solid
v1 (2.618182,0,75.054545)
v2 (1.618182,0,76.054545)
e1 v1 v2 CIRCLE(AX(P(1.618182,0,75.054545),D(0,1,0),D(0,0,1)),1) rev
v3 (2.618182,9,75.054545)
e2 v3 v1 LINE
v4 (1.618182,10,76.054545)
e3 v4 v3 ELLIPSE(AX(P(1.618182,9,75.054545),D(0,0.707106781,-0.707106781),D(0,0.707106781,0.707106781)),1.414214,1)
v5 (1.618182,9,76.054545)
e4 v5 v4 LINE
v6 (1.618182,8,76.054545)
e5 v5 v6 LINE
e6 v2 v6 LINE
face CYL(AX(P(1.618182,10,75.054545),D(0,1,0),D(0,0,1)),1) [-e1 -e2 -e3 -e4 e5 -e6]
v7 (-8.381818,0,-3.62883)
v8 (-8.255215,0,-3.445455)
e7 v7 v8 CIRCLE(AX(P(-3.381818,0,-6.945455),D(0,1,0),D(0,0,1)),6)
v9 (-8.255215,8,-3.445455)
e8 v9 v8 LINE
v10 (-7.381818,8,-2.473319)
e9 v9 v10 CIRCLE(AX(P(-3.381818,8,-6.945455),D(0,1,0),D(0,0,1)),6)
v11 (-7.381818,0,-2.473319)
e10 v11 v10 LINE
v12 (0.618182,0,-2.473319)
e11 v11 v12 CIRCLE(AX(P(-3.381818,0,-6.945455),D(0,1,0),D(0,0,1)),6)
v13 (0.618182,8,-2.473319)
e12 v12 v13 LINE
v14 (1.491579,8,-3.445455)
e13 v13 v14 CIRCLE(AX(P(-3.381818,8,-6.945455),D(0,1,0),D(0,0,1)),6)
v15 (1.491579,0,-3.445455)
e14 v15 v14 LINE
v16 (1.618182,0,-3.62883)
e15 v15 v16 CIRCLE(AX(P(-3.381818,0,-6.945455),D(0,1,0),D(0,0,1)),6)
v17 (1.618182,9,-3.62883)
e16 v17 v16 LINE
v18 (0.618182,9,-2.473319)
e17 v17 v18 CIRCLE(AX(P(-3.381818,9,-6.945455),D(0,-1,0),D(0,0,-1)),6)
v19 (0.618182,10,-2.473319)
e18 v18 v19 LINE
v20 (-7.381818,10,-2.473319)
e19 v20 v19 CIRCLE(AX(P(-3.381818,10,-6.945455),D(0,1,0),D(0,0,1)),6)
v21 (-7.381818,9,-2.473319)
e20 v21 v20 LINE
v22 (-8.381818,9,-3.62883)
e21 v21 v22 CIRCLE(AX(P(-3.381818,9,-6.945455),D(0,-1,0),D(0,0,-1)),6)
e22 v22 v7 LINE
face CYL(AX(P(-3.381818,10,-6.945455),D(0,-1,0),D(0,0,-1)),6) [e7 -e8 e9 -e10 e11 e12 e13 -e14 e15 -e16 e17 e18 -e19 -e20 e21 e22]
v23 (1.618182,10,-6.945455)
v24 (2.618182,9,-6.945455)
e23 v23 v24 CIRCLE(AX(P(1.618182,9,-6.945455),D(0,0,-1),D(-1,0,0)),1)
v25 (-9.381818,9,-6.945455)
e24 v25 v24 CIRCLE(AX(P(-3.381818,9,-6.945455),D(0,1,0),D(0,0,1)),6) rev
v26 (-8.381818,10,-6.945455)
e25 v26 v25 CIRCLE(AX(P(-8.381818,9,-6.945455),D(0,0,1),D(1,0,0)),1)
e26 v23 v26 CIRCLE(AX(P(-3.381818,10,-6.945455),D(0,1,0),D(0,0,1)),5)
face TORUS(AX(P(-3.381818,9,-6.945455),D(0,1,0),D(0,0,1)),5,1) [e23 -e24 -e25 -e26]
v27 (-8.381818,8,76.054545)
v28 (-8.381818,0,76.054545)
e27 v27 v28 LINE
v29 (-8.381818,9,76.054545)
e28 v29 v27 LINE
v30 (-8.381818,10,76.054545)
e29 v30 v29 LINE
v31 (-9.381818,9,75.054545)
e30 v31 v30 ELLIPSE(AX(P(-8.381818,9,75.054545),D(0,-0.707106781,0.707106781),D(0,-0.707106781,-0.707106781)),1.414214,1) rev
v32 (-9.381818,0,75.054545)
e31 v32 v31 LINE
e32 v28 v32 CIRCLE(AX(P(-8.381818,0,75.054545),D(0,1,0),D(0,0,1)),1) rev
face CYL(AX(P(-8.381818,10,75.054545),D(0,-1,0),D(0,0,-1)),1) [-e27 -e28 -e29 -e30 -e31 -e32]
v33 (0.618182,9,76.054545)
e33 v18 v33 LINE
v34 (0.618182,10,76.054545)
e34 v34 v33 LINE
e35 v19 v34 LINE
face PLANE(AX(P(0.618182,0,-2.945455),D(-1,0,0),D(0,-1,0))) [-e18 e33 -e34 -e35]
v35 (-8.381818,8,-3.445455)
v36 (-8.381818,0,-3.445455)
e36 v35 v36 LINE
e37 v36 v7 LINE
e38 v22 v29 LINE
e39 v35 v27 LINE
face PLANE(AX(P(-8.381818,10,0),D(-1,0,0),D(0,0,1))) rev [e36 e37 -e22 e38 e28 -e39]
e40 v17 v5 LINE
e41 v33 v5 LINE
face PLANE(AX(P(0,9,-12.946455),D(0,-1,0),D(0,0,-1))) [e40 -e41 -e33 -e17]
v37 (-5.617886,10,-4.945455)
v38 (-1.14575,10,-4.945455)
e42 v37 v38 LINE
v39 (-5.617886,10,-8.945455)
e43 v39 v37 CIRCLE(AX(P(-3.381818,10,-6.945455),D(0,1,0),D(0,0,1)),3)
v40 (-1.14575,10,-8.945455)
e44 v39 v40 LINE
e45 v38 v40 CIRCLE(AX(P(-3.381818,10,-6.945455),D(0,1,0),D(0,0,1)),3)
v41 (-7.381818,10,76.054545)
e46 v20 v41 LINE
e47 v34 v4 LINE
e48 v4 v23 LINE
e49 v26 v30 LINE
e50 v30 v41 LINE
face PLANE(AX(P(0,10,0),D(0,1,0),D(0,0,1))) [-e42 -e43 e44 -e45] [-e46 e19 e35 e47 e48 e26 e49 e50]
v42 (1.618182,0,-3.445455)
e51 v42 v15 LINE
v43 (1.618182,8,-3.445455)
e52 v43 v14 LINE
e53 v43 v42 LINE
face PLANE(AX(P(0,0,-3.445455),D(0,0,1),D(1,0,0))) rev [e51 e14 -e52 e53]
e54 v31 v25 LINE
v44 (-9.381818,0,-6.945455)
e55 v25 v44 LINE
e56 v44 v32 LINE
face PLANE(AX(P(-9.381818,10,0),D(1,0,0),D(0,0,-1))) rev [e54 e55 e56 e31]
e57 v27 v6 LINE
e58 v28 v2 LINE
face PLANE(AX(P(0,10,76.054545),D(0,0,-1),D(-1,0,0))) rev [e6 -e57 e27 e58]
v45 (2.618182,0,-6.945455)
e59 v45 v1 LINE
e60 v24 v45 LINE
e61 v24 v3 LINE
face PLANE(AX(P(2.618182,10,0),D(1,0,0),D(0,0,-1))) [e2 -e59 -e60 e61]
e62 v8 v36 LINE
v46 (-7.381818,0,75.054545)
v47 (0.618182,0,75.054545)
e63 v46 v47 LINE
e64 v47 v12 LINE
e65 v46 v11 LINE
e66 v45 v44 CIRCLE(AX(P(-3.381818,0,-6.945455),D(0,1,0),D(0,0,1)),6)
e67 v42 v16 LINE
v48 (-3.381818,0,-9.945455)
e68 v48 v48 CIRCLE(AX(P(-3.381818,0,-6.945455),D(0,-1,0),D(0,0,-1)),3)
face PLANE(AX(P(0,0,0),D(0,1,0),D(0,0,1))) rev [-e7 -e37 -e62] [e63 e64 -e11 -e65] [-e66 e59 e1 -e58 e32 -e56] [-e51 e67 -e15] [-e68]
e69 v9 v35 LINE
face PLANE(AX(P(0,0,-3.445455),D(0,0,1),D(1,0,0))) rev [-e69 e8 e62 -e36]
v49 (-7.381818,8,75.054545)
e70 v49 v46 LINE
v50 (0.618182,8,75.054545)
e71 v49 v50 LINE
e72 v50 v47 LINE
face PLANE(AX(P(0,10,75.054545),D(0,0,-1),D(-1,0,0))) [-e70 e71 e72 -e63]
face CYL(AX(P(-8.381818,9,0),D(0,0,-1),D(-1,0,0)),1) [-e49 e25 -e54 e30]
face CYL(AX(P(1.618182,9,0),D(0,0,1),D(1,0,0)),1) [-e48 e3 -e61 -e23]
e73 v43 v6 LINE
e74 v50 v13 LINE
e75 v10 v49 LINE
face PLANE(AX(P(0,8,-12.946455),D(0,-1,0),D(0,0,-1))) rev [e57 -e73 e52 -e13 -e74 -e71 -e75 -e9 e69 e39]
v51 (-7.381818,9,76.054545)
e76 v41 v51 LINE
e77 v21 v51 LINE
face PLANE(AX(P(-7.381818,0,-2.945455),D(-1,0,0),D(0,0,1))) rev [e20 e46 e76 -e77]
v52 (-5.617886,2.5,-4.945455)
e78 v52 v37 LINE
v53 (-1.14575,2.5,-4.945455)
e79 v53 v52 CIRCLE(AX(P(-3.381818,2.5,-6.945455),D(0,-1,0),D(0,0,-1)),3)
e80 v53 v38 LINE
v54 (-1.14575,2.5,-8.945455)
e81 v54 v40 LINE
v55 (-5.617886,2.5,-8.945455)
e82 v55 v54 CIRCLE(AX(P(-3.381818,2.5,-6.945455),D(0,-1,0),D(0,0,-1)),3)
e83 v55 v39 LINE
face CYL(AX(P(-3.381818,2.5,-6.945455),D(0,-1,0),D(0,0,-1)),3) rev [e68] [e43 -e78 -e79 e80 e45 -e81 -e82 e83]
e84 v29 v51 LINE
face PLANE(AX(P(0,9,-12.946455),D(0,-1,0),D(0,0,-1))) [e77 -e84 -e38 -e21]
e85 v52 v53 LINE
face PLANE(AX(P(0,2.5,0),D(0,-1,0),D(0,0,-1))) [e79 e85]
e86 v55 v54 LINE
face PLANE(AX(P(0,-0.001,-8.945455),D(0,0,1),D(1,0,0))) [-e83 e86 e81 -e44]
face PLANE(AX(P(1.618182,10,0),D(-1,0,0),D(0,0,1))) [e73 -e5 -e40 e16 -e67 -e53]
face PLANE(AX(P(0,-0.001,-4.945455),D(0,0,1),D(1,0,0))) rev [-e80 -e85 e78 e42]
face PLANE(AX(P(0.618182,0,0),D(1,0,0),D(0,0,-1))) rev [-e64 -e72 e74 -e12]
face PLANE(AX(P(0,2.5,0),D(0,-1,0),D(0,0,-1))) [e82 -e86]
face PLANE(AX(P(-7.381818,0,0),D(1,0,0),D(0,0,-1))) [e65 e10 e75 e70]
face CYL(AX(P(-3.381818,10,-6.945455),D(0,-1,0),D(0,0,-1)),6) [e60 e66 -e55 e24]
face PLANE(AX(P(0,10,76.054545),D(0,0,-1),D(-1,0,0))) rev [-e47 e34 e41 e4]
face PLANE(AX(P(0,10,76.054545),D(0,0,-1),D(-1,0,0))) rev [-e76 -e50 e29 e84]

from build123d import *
from build123d.topology import SkipClean

# Parameters (mm, degrees)
SKETCH1_W           = 1
SKETCH1_H           = 1
SKETCH1_W_2         = 5
BOSS_EXTRUDE2_DEPTH = 10
CUT_EXTRUDE1_DEPTH  = 7.5
CUT_EXTRUDE2_START  = -2.5
CUT_EXTRUDE2_DEPTH  = 2.5
CUT_EXTRUDE3_REACH  = 92.05
SKETCH5_W           = 5
SKETCH5_H           = 1
SKETCH6_W           = 2
SKETCH6_H           = 1
BOSS_EXTRUDE3_DEPTH = 79.5
FILLET1_R           = 1
SKETCH7_W           = 1
SKETCH7_H           = 1
CUT_EXTRUDE7_DEPTH  = 79
BOSS_EXTRUDE4_DEPTH = 3
SKETCH9_W           = 1
SKETCH9_H           = 1
CUT_EXTRUDE8_DEPTH  = 6
SKETCH11_W          = 1
SKETCH11_H          = 1
BOSS_EXTRUDE5_DEPTH = 80
SKETCH12_W          = 1
SKETCH12_H          = 1
BOSS_EXTRUDE6_DEPTH = 80
BOSS_EXTRUDE7_DEPTH = 8
CUT_EXTRUDE9_DEPTH  = 1
SKETCH15_R          = 3
CUT_EXTRUDE10_DEPTH = 2.5
CUT_EXTRUDE13_REACH = 79.281


with BuildPart() as part:
    # Sketch1 → Boss-Extrude2 (new body)
    with BuildSketch(Plane(origin=(0, 0, 0), x_dir=(1, 0, 0), z_dir=(0, 1, 0))):
        with BuildLine():
            Line((-5.881818182, 6.945454545), (-3.381818182, 6.945454545))
            Line((-3.381818182, 6.945454545), (-0.881818182, 6.945454545))
            ThreePointArc((-0.881818182, 6.945454545), (-3.381818182, 9.445454545), (-5.881818182, 6.945454545))
        make_face()
        with BuildLine():
            Line((-0.881818182, 6.945454545), (-3.381818182, 6.945454545))
            Line((-3.381818182, 6.945454545), (-3.381818182, 4.445454545))
            ThreePointArc((-3.381818182, 4.445454545), (-1.614051229, 5.177687592), (-0.881818182, 6.945454545))
        make_face()
        with BuildLine():
            Line((-3.381818182, 4.445454545), (-3.381818182, 6.945454545))
            Line((-3.381818182, 6.945454545), (-5.881818182, 6.945454545))
            ThreePointArc((-5.881818182, 6.945454545), (-5.149585135, 5.177687592), (-3.381818182, 4.445454545))
        make_face()
        with BuildLine():
            ThreePointArc((-0.881818182, 6.945454545), (-1.614051229, 5.177687592), (-3.381818182, 4.445454545))
            Line((-3.381818182, 4.445454545), (-3.381818182, 0.945454545))
            ThreePointArc((-3.381818182, 0.945454545), (-0.544543851, 1.658690472), (1.618181818, 3.628829755))
            ThreePointArc((1.618181818, 3.628829755), (2.362744465, 5.213403738), (2.618181818, 6.945454545))
            Line((2.618181818, 6.945454545), (-0.881818182, 6.945454545))
        make_face()
        with BuildLine():
            Line((-3.381818182, 0.945454545), (-3.381818182, 4.445454545))
            ThreePointArc((-3.381818182, 4.445454545), (-5.149585135, 5.177687592), (-5.881818182, 6.945454545))
            Line((-5.881818182, 6.945454545), (-9.381818182, 6.945454545))
            ThreePointArc((-9.381818182, 6.945454545), (-9.126380828, 5.213403738), (-8.381818182, 3.628829755))
            ThreePointArc((-8.381818182, 3.628829755), (-6.219092513, 1.658690472), (-3.381818182, 0.945454545))
        make_face()
        with BuildLine():
            ThreePointArc((-5.881818182, 6.945454545), (-3.381818182, 9.445454545), (-0.881818182, 6.945454545))
            Line((-0.881818182, 6.945454545), (2.618181818, 6.945454545))
            ThreePointArc((2.618181818, 6.945454545), (-3.381818182, 12.945454545), (-9.381818182, 6.945454545))
            Line((-9.381818182, 6.945454545), (-5.881818182, 6.945454545))
        make_face()
        with BuildLine():
            Line((2.618181818, -75.054545455), (2.618181818, 6.945454545))
            ThreePointArc((2.618181818, 6.945454545), (2.362744465, 5.213403738), (1.618181818, 3.628829755))
            Line((1.618181818, 3.628829755), (1.618181818, -75.054545455))
            Line((1.618181818, -75.054545455), (2.618181818, -75.054545455))
        make_face()
        with BuildLine():
            ThreePointArc((-8.381818182, 3.628829755), (-9.126380828, 5.213403738), (-9.381818182, 6.945454545))
            Line((-9.381818182, 6.945454545), (-9.381818182, -75.054545455))
            Line((-9.381818182, -75.054545455), (-8.381818182, -75.054545455))
            Line((-8.381818182, -75.054545455), (-8.381818182, 3.628829755))
        make_face()
        with Locations((-8.881818182, -75.554545455)):
            Rectangle(SKETCH1_W, SKETCH1_H)
        with Locations((-5.881818182, -75.554545455)):
            Rectangle(SKETCH1_W_2, SKETCH1_H)
        with Locations((-0.881818182, -75.554545455)):
            Rectangle(SKETCH1_W_2, SKETCH1_H)
        with Locations((2.118181818, -75.554545455)):
            Rectangle(SKETCH1_W, SKETCH1_H)
    extrude(amount=BOSS_EXTRUDE2_DEPTH)

    # Sketch3 → Cut-Extrude1 (cut)
    with BuildSketch(Plane(origin=(0, 10, 0), x_dir=(1, 0, 0), z_dir=(0, 1, 0))):
        with BuildLine():
            Line((-1.381818182, 8.445454545), (-5.381818182, 8.445454545))
            ThreePointArc((-5.381818182, 8.445454545), (-5.753526425, 7.736023967), (-5.881818182, 6.945454559))
            ThreePointArc((-5.881818182, 6.945454559), (-5.753526429, 6.154885137), (-5.381818182, 5.445454545))
            Line((-5.381818182, 5.445454545), (-1.381818182, 5.445454545))
            ThreePointArc((-1.381818182, 5.445454545), (-1.010109937, 6.15488513), (-0.881818182, 6.945454545))
            ThreePointArc((-0.881818182, 6.945454545), (-1.010109937, 7.73602396), (-1.381818182, 8.445454545))
        make_face()
    extrude(amount=-CUT_EXTRUDE1_DEPTH, mode=Mode.SUBTRACT)

    # Sketch4 → Cut-Extrude2 (cut)
    with SkipClean():  # the faces are left unmerged after this step: merging them gives an invalid solid
        with BuildSketch(Plane.XZ.offset(CUT_EXTRUDE2_START)):
            with BuildLine():
                ThreePointArc((-0.881818182, -6.945454545), (-1.614051229, -5.177687592), (-3.381818182, -4.445454545))
                Line((-3.381818182, -4.445454545), (-3.381818182, -9.445454545))
                ThreePointArc((-3.381818182, -9.445454545), (-1.614051229, -8.713221498), (-0.881818182, -6.945454545))
            make_face()
            with BuildLine():
                Line((-3.381818182, -9.445454545), (-3.381818182, -4.445454545))
                ThreePointArc((-3.381818182, -4.445454545), (-5.881818182, -6.945454545), (-3.381818182, -9.445454545))
            make_face()
        extrude(amount=CUT_EXTRUDE2_DEPTH, mode=Mode.SUBTRACT)

    # Sketch5 → Cut-Extrude3 (cut, up to next)
    with BuildSketch(Plane.XY.offset(76.054545455), mode=Mode.PRIVATE) as cut_extrude3_sk1:
        with Locations((-5.881818182, 8.5)):
            Rectangle(SKETCH5_W, SKETCH5_H)
    cut_extrude3_tool1 = extrude(cut_extrude3_sk1.sketch, amount=-CUT_EXTRUDE3_REACH, mode=Mode.PRIVATE) & part.part
    # Sketch5 → Cut-Extrude3 (cut, up to next)
    with BuildSketch(Plane.XY.offset(76.054545455), mode=Mode.PRIVATE) as cut_extrude3_sk2:
        with Locations((-0.881818182, 8.5)):
            Rectangle(SKETCH5_W, SKETCH5_H)
    cut_extrude3_tool2 = extrude(cut_extrude3_sk2.sketch, amount=-CUT_EXTRUDE3_REACH, mode=Mode.PRIVATE) & part.part
    add(cut_extrude3_tool1.solids().sort_by_distance((-5.881818, 8.5, 76.054545))[0], mode=Mode.SUBTRACT)
    add(cut_extrude3_tool2.solids().sort_by_distance((-0.881818, 8.5, 76.054545))[0], mode=Mode.SUBTRACT)

    # Sketch6 → Boss-Extrude3 (add)
    with SkipClean():  # the faces are left unmerged after this step: merging them gives an invalid solid
        with BuildSketch(Plane.XY.offset(76.054545455)):
            with Locations((-7.381818182, 9.5)):
                Rectangle(SKETCH6_W, SKETCH6_H)
            with Locations((-7.381818182, 7.5)):
                Rectangle(SKETCH6_W, SKETCH6_H)
            with Locations((0.618181818, 7.5)):
                Rectangle(SKETCH6_W, SKETCH6_H)
            with Locations((0.618181818, 9.5)):
                Rectangle(SKETCH6_W, SKETCH6_H)
        extrude(amount=-BOSS_EXTRUDE3_DEPTH)

    # Fillet1
    fillet1_edges = [part.edges().sort_by_distance(p)[0] for p in [
        (2.618181818, 10, 34.554545455),
        (-9.381818182, 5, 76.054545455),
        (2.618181818, 5, 76.054545455),
        (-3.381818182, 10, -12.945454545),
        (-9.381818182, 10, 34.554545455),
    ]]
    fillet(fillet1_edges, radius=FILLET1_R - 0.0001)  # a hair under: the kernel refuses the full size

    # Sketch7 → Cut-Extrude7 (cut)
    with BuildSketch(Plane.XY.offset(76.054545455)):
        with Locations((-6.881818182, 9.5)):
            Rectangle(SKETCH7_W, SKETCH7_H)
        with Locations((0.118181818, 9.5)):
            Rectangle(SKETCH7_W, SKETCH7_H)
    extrude(amount=-CUT_EXTRUDE7_DEPTH, mode=Mode.SUBTRACT)


with BuildPart() as cut_extrude7_piece_1:
    # of the separate pieces the step leaves, piece 1, a body of its own (cut_extrude7_pieces)
    add(part.part.solids().sort_by_distance((1.618281818, 0, 76.054545455))[0])

    # Sketch8 → Boss-Extrude4 (add)
    # profile 1 of 5: a face of its own
    with BuildSketch(Plane(origin=(0, 10, 0), x_dir=(1, 0, 0), z_dir=(0, 1, 0))):
        with BuildLine():
            Line((-8.381818182, 6.945454545), (-8.381818182, 3.628829755))
            ThreePointArc((-8.381818182, 3.628829755), (-8.319368136, 3.536554363), (-8.255215354, 3.445454545))
            ThreePointArc((-8.255215354, 3.445454545), (-7.845063237, 2.935536395), (-7.381818182, 2.47331859))
            Line((-7.381818182, 2.47331859), (-7.381818182, 2.945454545))
            Line((-7.381818182, 2.945454545), (-6.381818182, 2.945454545))
            Line((-6.381818182, 2.945454545), (-6.381818182, 1.749302123))
            ThreePointArc((-6.381818182, 1.749302123), (-3.381818182, 0.945454545), (-0.381818182, 1.749302123))
            Line((-0.381818182, 1.749302123), (-0.381818182, 2.945454545))
            Line((-0.381818182, 2.945454545), (0.618181818, 2.945454545))
            Line((0.618181818, 2.945454545), (0.618181818, 2.47331859))
            ThreePointArc((0.618181818, 2.47331859), (1.081426873, 2.935536395), (1.491578991, 3.445454545))
            ThreePointArc((1.491578991, 3.445454545), (1.555731772, 3.536554363), (1.618181818, 3.628829755))
            Line((1.618181818, 3.628829755), (1.618181818, 6.945454545))
            ThreePointArc((1.618181818, 6.945454545), (-3.381818182, 11.945454545), (-8.381818182, 6.945454545))
        make_face()
        with BuildLine():
            ThreePointArc((-5.381818182, 5.445454545), (-5.881818182, 6.945454545), (-5.381818182, 8.445454545))
            ThreePointArc((-5.381818182, 8.445454545), (-3.381818182, 9.445454545), (-1.381818182, 8.445454545))
            ThreePointArc((-1.381818182, 8.445454545), (-1.010109937, 7.73602396), (-0.881818182, 6.945454545))
            ThreePointArc((-0.881818182, 6.945454545), (-1.010109937, 6.15488513), (-1.381818182, 5.445454545))
            ThreePointArc((-1.381818182, 5.445454545), (-3.381818182, 4.445454545), (-5.381818182, 5.445454545))
        make_face(mode=Mode.SUBTRACT)
    # profile 2 of 5: a face of its own
    with BuildSketch(Plane(origin=(0, 10, 0), x_dir=(1, 0, 0), z_dir=(0, 1, 0))):
        with BuildLine():
            ThreePointArc((-0.381818182, 1.749302123), (0.136853437, 2.085521414), (0.618181818, 2.47331859))
            Line((0.618181818, 2.47331859), (0.618181818, 2.945454545))
            Line((0.618181818, 2.945454545), (-0.381818182, 2.945454545))
            Line((-0.381818182, 2.945454545), (-0.381818182, 1.749302123))
        make_face()
    # profile 3 of 5: a face of its own
    with BuildSketch(Plane(origin=(0, 10, 0), x_dir=(1, 0, 0), z_dir=(0, 1, 0))):
        with BuildLine():
            Line((-7.381818182, 2.945454545), (-7.381818182, 2.47331859))
            ThreePointArc((-7.381818182, 2.47331859), (-6.900489801, 2.085521414), (-6.381818182, 1.749302123))
            Line((-6.381818182, 1.749302123), (-6.381818182, 2.945454545))
            Line((-6.381818182, 2.945454545), (-7.381818182, 2.945454545))
        make_face()
    # profile 4 of 5: a face of its own
    with BuildSketch(Plane(origin=(0, 10, 0), x_dir=(1, 0, 0), z_dir=(0, 1, 0))):
        with BuildLine():
            ThreePointArc((-1.381818182, 8.445454545), (-3.381818182, 9.445454545), (-5.381818182, 8.445454545))
            Line((-5.381818182, 8.445454545), (-1.381818182, 8.445454545))
        make_face()
    # profile 5 of 5: a face of its own
    with BuildSketch(Plane(origin=(0, 10, 0), x_dir=(1, 0, 0), z_dir=(0, 1, 0))):
        with BuildLine():
            Line((-1.381818182, 5.445454545), (-5.381818182, 5.445454545))
            ThreePointArc((-5.381818182, 5.445454545), (-3.381818182, 4.445454545), (-1.381818182, 5.445454545))
        make_face()
    extrude(amount=-BOSS_EXTRUDE4_DEPTH)

    # Sketch11 → Boss-Extrude5 (add)
    with BuildSketch(Plane.XY.offset(76.054545455)):
        with Locations((-7.881818182, 9.5)):
            Rectangle(SKETCH11_W, SKETCH11_H)
    extrude(amount=-BOSS_EXTRUDE5_DEPTH)

    # Sketch12 → Boss-Extrude6 (add)
    with BuildSketch(Plane.XY.offset(76.054545455)):
        with Locations((1.118181818, 9.5)):
            Rectangle(SKETCH12_W, SKETCH12_H)
    extrude(amount=-BOSS_EXTRUDE6_DEPTH)

    # Sketch13 → Boss-Extrude7 (add)
    with BuildSketch(Plane(origin=(0, 8, 0), x_dir=(1, 0, 0), z_dir=(0, 1, 0))):
        with BuildLine():
            Line((-8.381818182, 3.445454545), (-8.381818182, -76.054545455))
            Line((-8.381818182, -76.054545455), (-7.381818182, -76.054545455))
            Line((-7.381818182, -76.054545455), (-7.381818182, 2.47331859))
            ThreePointArc((-7.381818182, 2.47331859), (-7.845063237, 2.935536395), (-8.255215354, 3.445454545))
            Line((-8.255215354, 3.445454545), (-8.381818182, 3.445454545))
        make_face()
        with BuildLine():
            Line((0.618181818, 2.47331859), (0.618181818, -76.054545455))
            Line((0.618181818, -76.054545455), (1.618181818, -76.054545455))
            Line((1.618181818, -76.054545455), (1.618181818, 3.445454545))
            Line((1.618181818, 3.445454545), (1.491578991, 3.445454545))
            ThreePointArc((1.491578991, 3.445454545), (1.081426873, 2.935536395), (0.618181818, 2.47331859))
        make_face()
    extrude(amount=-BOSS_EXTRUDE7_DEPTH)

    # Sketch14 → Cut-Extrude9 (cut)
    with BuildSketch(Plane(origin=(0, 8, 0), x_dir=(1, 0, 0), z_dir=(0, 1, 0))):
        with BuildLine():
            ThreePointArc((0.618181818, 2.47331859), (0.136853437, 2.085521414), (-0.381818182, 1.749302123))
            Line((-0.381818182, 1.749302123), (-0.381818182, -75.054545455))
            Line((-0.381818182, -75.054545455), (0.618181818, -75.054545455))
            Line((0.618181818, -75.054545455), (0.618181818, 2.47331859))
        make_face()
        with BuildLine():
            ThreePointArc((-6.381818182, 1.749302123), (-6.900489801, 2.085521414), (-7.381818182, 2.47331859))
            Line((-7.381818182, 2.47331859), (-7.381818182, -75.054545455))
            Line((-7.381818182, -75.054545455), (-6.381818182, -75.054545455))
            Line((-6.381818182, -75.054545455), (-6.381818182, 1.749302123))
        make_face()
    extrude(amount=-CUT_EXTRUDE9_DEPTH, mode=Mode.SUBTRACT)

    # Sketch15 → Cut-Extrude10 (cut)
    with BuildSketch(Plane.XZ):
        with Locations(Location((-3.381818182, -6.945454545, 0), (0, 0, 270))):
            Circle(SKETCH15_R)
    extrude(amount=-CUT_EXTRUDE10_DEPTH, mode=Mode.SUBTRACT)

    # Sketch17 → Cut-Extrude13 (cut, up to next)
    with BuildSketch(Plane(origin=(0, 10, 0), x_dir=(1, 0, 0), z_dir=(0, 1, 0)), mode=Mode.PRIVATE) as cut_extrude13_sk1:
        with BuildLine():
            Line((-1.145750204, 8.945454545), (-5.617886159, 8.945454545))
            ThreePointArc((-5.617886159, 8.945454545), (-6.381818182, 6.945454545), (-5.617886159, 4.945454545))
            Line((-5.617886159, 4.945454545), (-1.145750204, 4.945454545))
            ThreePointArc((-1.145750204, 4.945454545), (-0.579301105, 5.874988276), (-0.381818182, 6.945454545))
            ThreePointArc((-0.381818182, 6.945454545), (-0.579301105, 8.015920815), (-1.145750204, 8.945454545))
        make_face()
        with BuildLine():
            ThreePointArc((-1.381818182, 8.445454545), (-0.881818182, 6.945454545), (-1.381818182, 5.445454545))
            Line((-1.381818182, 5.445454545), (-5.381818182, 5.445454545))
            ThreePointArc((-5.381818182, 5.445454545), (-5.881818182, 6.945454545), (-5.381818182, 8.445454545))
            Line((-5.381818182, 8.445454545), (-1.381818182, 8.445454545))
        make_face(mode=Mode.SUBTRACT)
    cut_extrude13_tool1 = extrude(cut_extrude13_sk1.sketch, amount=-CUT_EXTRUDE13_REACH, mode=Mode.PRIVATE) & cut_extrude7_piece_1.part
    add(cut_extrude13_tool1.solids().sort_by_distance((-3.381818, 10, -8.873344))[0], mode=Mode.SUBTRACT)


with BuildPart() as cut_extrude7_piece_2:
    # of the separate pieces the step leaves, piece 2, a body of its own (cut_extrude7_pieces)
    add(part.part.solids().sort_by_distance((-6.381818182, 10, 76.054545455))[0])

    # Sketch9 → Cut-Extrude8 (cut)
    with BuildSketch(Plane.ZY.offset(6.381818182)):
        with Locations((75.554545455, 9.5)):
            Rectangle(SKETCH9_W, SKETCH9_H)
    extrude(amount=-CUT_EXTRUDE8_DEPTH, mode=Mode.SUBTRACT)


solid = cut_extrude7_piece_1.part
